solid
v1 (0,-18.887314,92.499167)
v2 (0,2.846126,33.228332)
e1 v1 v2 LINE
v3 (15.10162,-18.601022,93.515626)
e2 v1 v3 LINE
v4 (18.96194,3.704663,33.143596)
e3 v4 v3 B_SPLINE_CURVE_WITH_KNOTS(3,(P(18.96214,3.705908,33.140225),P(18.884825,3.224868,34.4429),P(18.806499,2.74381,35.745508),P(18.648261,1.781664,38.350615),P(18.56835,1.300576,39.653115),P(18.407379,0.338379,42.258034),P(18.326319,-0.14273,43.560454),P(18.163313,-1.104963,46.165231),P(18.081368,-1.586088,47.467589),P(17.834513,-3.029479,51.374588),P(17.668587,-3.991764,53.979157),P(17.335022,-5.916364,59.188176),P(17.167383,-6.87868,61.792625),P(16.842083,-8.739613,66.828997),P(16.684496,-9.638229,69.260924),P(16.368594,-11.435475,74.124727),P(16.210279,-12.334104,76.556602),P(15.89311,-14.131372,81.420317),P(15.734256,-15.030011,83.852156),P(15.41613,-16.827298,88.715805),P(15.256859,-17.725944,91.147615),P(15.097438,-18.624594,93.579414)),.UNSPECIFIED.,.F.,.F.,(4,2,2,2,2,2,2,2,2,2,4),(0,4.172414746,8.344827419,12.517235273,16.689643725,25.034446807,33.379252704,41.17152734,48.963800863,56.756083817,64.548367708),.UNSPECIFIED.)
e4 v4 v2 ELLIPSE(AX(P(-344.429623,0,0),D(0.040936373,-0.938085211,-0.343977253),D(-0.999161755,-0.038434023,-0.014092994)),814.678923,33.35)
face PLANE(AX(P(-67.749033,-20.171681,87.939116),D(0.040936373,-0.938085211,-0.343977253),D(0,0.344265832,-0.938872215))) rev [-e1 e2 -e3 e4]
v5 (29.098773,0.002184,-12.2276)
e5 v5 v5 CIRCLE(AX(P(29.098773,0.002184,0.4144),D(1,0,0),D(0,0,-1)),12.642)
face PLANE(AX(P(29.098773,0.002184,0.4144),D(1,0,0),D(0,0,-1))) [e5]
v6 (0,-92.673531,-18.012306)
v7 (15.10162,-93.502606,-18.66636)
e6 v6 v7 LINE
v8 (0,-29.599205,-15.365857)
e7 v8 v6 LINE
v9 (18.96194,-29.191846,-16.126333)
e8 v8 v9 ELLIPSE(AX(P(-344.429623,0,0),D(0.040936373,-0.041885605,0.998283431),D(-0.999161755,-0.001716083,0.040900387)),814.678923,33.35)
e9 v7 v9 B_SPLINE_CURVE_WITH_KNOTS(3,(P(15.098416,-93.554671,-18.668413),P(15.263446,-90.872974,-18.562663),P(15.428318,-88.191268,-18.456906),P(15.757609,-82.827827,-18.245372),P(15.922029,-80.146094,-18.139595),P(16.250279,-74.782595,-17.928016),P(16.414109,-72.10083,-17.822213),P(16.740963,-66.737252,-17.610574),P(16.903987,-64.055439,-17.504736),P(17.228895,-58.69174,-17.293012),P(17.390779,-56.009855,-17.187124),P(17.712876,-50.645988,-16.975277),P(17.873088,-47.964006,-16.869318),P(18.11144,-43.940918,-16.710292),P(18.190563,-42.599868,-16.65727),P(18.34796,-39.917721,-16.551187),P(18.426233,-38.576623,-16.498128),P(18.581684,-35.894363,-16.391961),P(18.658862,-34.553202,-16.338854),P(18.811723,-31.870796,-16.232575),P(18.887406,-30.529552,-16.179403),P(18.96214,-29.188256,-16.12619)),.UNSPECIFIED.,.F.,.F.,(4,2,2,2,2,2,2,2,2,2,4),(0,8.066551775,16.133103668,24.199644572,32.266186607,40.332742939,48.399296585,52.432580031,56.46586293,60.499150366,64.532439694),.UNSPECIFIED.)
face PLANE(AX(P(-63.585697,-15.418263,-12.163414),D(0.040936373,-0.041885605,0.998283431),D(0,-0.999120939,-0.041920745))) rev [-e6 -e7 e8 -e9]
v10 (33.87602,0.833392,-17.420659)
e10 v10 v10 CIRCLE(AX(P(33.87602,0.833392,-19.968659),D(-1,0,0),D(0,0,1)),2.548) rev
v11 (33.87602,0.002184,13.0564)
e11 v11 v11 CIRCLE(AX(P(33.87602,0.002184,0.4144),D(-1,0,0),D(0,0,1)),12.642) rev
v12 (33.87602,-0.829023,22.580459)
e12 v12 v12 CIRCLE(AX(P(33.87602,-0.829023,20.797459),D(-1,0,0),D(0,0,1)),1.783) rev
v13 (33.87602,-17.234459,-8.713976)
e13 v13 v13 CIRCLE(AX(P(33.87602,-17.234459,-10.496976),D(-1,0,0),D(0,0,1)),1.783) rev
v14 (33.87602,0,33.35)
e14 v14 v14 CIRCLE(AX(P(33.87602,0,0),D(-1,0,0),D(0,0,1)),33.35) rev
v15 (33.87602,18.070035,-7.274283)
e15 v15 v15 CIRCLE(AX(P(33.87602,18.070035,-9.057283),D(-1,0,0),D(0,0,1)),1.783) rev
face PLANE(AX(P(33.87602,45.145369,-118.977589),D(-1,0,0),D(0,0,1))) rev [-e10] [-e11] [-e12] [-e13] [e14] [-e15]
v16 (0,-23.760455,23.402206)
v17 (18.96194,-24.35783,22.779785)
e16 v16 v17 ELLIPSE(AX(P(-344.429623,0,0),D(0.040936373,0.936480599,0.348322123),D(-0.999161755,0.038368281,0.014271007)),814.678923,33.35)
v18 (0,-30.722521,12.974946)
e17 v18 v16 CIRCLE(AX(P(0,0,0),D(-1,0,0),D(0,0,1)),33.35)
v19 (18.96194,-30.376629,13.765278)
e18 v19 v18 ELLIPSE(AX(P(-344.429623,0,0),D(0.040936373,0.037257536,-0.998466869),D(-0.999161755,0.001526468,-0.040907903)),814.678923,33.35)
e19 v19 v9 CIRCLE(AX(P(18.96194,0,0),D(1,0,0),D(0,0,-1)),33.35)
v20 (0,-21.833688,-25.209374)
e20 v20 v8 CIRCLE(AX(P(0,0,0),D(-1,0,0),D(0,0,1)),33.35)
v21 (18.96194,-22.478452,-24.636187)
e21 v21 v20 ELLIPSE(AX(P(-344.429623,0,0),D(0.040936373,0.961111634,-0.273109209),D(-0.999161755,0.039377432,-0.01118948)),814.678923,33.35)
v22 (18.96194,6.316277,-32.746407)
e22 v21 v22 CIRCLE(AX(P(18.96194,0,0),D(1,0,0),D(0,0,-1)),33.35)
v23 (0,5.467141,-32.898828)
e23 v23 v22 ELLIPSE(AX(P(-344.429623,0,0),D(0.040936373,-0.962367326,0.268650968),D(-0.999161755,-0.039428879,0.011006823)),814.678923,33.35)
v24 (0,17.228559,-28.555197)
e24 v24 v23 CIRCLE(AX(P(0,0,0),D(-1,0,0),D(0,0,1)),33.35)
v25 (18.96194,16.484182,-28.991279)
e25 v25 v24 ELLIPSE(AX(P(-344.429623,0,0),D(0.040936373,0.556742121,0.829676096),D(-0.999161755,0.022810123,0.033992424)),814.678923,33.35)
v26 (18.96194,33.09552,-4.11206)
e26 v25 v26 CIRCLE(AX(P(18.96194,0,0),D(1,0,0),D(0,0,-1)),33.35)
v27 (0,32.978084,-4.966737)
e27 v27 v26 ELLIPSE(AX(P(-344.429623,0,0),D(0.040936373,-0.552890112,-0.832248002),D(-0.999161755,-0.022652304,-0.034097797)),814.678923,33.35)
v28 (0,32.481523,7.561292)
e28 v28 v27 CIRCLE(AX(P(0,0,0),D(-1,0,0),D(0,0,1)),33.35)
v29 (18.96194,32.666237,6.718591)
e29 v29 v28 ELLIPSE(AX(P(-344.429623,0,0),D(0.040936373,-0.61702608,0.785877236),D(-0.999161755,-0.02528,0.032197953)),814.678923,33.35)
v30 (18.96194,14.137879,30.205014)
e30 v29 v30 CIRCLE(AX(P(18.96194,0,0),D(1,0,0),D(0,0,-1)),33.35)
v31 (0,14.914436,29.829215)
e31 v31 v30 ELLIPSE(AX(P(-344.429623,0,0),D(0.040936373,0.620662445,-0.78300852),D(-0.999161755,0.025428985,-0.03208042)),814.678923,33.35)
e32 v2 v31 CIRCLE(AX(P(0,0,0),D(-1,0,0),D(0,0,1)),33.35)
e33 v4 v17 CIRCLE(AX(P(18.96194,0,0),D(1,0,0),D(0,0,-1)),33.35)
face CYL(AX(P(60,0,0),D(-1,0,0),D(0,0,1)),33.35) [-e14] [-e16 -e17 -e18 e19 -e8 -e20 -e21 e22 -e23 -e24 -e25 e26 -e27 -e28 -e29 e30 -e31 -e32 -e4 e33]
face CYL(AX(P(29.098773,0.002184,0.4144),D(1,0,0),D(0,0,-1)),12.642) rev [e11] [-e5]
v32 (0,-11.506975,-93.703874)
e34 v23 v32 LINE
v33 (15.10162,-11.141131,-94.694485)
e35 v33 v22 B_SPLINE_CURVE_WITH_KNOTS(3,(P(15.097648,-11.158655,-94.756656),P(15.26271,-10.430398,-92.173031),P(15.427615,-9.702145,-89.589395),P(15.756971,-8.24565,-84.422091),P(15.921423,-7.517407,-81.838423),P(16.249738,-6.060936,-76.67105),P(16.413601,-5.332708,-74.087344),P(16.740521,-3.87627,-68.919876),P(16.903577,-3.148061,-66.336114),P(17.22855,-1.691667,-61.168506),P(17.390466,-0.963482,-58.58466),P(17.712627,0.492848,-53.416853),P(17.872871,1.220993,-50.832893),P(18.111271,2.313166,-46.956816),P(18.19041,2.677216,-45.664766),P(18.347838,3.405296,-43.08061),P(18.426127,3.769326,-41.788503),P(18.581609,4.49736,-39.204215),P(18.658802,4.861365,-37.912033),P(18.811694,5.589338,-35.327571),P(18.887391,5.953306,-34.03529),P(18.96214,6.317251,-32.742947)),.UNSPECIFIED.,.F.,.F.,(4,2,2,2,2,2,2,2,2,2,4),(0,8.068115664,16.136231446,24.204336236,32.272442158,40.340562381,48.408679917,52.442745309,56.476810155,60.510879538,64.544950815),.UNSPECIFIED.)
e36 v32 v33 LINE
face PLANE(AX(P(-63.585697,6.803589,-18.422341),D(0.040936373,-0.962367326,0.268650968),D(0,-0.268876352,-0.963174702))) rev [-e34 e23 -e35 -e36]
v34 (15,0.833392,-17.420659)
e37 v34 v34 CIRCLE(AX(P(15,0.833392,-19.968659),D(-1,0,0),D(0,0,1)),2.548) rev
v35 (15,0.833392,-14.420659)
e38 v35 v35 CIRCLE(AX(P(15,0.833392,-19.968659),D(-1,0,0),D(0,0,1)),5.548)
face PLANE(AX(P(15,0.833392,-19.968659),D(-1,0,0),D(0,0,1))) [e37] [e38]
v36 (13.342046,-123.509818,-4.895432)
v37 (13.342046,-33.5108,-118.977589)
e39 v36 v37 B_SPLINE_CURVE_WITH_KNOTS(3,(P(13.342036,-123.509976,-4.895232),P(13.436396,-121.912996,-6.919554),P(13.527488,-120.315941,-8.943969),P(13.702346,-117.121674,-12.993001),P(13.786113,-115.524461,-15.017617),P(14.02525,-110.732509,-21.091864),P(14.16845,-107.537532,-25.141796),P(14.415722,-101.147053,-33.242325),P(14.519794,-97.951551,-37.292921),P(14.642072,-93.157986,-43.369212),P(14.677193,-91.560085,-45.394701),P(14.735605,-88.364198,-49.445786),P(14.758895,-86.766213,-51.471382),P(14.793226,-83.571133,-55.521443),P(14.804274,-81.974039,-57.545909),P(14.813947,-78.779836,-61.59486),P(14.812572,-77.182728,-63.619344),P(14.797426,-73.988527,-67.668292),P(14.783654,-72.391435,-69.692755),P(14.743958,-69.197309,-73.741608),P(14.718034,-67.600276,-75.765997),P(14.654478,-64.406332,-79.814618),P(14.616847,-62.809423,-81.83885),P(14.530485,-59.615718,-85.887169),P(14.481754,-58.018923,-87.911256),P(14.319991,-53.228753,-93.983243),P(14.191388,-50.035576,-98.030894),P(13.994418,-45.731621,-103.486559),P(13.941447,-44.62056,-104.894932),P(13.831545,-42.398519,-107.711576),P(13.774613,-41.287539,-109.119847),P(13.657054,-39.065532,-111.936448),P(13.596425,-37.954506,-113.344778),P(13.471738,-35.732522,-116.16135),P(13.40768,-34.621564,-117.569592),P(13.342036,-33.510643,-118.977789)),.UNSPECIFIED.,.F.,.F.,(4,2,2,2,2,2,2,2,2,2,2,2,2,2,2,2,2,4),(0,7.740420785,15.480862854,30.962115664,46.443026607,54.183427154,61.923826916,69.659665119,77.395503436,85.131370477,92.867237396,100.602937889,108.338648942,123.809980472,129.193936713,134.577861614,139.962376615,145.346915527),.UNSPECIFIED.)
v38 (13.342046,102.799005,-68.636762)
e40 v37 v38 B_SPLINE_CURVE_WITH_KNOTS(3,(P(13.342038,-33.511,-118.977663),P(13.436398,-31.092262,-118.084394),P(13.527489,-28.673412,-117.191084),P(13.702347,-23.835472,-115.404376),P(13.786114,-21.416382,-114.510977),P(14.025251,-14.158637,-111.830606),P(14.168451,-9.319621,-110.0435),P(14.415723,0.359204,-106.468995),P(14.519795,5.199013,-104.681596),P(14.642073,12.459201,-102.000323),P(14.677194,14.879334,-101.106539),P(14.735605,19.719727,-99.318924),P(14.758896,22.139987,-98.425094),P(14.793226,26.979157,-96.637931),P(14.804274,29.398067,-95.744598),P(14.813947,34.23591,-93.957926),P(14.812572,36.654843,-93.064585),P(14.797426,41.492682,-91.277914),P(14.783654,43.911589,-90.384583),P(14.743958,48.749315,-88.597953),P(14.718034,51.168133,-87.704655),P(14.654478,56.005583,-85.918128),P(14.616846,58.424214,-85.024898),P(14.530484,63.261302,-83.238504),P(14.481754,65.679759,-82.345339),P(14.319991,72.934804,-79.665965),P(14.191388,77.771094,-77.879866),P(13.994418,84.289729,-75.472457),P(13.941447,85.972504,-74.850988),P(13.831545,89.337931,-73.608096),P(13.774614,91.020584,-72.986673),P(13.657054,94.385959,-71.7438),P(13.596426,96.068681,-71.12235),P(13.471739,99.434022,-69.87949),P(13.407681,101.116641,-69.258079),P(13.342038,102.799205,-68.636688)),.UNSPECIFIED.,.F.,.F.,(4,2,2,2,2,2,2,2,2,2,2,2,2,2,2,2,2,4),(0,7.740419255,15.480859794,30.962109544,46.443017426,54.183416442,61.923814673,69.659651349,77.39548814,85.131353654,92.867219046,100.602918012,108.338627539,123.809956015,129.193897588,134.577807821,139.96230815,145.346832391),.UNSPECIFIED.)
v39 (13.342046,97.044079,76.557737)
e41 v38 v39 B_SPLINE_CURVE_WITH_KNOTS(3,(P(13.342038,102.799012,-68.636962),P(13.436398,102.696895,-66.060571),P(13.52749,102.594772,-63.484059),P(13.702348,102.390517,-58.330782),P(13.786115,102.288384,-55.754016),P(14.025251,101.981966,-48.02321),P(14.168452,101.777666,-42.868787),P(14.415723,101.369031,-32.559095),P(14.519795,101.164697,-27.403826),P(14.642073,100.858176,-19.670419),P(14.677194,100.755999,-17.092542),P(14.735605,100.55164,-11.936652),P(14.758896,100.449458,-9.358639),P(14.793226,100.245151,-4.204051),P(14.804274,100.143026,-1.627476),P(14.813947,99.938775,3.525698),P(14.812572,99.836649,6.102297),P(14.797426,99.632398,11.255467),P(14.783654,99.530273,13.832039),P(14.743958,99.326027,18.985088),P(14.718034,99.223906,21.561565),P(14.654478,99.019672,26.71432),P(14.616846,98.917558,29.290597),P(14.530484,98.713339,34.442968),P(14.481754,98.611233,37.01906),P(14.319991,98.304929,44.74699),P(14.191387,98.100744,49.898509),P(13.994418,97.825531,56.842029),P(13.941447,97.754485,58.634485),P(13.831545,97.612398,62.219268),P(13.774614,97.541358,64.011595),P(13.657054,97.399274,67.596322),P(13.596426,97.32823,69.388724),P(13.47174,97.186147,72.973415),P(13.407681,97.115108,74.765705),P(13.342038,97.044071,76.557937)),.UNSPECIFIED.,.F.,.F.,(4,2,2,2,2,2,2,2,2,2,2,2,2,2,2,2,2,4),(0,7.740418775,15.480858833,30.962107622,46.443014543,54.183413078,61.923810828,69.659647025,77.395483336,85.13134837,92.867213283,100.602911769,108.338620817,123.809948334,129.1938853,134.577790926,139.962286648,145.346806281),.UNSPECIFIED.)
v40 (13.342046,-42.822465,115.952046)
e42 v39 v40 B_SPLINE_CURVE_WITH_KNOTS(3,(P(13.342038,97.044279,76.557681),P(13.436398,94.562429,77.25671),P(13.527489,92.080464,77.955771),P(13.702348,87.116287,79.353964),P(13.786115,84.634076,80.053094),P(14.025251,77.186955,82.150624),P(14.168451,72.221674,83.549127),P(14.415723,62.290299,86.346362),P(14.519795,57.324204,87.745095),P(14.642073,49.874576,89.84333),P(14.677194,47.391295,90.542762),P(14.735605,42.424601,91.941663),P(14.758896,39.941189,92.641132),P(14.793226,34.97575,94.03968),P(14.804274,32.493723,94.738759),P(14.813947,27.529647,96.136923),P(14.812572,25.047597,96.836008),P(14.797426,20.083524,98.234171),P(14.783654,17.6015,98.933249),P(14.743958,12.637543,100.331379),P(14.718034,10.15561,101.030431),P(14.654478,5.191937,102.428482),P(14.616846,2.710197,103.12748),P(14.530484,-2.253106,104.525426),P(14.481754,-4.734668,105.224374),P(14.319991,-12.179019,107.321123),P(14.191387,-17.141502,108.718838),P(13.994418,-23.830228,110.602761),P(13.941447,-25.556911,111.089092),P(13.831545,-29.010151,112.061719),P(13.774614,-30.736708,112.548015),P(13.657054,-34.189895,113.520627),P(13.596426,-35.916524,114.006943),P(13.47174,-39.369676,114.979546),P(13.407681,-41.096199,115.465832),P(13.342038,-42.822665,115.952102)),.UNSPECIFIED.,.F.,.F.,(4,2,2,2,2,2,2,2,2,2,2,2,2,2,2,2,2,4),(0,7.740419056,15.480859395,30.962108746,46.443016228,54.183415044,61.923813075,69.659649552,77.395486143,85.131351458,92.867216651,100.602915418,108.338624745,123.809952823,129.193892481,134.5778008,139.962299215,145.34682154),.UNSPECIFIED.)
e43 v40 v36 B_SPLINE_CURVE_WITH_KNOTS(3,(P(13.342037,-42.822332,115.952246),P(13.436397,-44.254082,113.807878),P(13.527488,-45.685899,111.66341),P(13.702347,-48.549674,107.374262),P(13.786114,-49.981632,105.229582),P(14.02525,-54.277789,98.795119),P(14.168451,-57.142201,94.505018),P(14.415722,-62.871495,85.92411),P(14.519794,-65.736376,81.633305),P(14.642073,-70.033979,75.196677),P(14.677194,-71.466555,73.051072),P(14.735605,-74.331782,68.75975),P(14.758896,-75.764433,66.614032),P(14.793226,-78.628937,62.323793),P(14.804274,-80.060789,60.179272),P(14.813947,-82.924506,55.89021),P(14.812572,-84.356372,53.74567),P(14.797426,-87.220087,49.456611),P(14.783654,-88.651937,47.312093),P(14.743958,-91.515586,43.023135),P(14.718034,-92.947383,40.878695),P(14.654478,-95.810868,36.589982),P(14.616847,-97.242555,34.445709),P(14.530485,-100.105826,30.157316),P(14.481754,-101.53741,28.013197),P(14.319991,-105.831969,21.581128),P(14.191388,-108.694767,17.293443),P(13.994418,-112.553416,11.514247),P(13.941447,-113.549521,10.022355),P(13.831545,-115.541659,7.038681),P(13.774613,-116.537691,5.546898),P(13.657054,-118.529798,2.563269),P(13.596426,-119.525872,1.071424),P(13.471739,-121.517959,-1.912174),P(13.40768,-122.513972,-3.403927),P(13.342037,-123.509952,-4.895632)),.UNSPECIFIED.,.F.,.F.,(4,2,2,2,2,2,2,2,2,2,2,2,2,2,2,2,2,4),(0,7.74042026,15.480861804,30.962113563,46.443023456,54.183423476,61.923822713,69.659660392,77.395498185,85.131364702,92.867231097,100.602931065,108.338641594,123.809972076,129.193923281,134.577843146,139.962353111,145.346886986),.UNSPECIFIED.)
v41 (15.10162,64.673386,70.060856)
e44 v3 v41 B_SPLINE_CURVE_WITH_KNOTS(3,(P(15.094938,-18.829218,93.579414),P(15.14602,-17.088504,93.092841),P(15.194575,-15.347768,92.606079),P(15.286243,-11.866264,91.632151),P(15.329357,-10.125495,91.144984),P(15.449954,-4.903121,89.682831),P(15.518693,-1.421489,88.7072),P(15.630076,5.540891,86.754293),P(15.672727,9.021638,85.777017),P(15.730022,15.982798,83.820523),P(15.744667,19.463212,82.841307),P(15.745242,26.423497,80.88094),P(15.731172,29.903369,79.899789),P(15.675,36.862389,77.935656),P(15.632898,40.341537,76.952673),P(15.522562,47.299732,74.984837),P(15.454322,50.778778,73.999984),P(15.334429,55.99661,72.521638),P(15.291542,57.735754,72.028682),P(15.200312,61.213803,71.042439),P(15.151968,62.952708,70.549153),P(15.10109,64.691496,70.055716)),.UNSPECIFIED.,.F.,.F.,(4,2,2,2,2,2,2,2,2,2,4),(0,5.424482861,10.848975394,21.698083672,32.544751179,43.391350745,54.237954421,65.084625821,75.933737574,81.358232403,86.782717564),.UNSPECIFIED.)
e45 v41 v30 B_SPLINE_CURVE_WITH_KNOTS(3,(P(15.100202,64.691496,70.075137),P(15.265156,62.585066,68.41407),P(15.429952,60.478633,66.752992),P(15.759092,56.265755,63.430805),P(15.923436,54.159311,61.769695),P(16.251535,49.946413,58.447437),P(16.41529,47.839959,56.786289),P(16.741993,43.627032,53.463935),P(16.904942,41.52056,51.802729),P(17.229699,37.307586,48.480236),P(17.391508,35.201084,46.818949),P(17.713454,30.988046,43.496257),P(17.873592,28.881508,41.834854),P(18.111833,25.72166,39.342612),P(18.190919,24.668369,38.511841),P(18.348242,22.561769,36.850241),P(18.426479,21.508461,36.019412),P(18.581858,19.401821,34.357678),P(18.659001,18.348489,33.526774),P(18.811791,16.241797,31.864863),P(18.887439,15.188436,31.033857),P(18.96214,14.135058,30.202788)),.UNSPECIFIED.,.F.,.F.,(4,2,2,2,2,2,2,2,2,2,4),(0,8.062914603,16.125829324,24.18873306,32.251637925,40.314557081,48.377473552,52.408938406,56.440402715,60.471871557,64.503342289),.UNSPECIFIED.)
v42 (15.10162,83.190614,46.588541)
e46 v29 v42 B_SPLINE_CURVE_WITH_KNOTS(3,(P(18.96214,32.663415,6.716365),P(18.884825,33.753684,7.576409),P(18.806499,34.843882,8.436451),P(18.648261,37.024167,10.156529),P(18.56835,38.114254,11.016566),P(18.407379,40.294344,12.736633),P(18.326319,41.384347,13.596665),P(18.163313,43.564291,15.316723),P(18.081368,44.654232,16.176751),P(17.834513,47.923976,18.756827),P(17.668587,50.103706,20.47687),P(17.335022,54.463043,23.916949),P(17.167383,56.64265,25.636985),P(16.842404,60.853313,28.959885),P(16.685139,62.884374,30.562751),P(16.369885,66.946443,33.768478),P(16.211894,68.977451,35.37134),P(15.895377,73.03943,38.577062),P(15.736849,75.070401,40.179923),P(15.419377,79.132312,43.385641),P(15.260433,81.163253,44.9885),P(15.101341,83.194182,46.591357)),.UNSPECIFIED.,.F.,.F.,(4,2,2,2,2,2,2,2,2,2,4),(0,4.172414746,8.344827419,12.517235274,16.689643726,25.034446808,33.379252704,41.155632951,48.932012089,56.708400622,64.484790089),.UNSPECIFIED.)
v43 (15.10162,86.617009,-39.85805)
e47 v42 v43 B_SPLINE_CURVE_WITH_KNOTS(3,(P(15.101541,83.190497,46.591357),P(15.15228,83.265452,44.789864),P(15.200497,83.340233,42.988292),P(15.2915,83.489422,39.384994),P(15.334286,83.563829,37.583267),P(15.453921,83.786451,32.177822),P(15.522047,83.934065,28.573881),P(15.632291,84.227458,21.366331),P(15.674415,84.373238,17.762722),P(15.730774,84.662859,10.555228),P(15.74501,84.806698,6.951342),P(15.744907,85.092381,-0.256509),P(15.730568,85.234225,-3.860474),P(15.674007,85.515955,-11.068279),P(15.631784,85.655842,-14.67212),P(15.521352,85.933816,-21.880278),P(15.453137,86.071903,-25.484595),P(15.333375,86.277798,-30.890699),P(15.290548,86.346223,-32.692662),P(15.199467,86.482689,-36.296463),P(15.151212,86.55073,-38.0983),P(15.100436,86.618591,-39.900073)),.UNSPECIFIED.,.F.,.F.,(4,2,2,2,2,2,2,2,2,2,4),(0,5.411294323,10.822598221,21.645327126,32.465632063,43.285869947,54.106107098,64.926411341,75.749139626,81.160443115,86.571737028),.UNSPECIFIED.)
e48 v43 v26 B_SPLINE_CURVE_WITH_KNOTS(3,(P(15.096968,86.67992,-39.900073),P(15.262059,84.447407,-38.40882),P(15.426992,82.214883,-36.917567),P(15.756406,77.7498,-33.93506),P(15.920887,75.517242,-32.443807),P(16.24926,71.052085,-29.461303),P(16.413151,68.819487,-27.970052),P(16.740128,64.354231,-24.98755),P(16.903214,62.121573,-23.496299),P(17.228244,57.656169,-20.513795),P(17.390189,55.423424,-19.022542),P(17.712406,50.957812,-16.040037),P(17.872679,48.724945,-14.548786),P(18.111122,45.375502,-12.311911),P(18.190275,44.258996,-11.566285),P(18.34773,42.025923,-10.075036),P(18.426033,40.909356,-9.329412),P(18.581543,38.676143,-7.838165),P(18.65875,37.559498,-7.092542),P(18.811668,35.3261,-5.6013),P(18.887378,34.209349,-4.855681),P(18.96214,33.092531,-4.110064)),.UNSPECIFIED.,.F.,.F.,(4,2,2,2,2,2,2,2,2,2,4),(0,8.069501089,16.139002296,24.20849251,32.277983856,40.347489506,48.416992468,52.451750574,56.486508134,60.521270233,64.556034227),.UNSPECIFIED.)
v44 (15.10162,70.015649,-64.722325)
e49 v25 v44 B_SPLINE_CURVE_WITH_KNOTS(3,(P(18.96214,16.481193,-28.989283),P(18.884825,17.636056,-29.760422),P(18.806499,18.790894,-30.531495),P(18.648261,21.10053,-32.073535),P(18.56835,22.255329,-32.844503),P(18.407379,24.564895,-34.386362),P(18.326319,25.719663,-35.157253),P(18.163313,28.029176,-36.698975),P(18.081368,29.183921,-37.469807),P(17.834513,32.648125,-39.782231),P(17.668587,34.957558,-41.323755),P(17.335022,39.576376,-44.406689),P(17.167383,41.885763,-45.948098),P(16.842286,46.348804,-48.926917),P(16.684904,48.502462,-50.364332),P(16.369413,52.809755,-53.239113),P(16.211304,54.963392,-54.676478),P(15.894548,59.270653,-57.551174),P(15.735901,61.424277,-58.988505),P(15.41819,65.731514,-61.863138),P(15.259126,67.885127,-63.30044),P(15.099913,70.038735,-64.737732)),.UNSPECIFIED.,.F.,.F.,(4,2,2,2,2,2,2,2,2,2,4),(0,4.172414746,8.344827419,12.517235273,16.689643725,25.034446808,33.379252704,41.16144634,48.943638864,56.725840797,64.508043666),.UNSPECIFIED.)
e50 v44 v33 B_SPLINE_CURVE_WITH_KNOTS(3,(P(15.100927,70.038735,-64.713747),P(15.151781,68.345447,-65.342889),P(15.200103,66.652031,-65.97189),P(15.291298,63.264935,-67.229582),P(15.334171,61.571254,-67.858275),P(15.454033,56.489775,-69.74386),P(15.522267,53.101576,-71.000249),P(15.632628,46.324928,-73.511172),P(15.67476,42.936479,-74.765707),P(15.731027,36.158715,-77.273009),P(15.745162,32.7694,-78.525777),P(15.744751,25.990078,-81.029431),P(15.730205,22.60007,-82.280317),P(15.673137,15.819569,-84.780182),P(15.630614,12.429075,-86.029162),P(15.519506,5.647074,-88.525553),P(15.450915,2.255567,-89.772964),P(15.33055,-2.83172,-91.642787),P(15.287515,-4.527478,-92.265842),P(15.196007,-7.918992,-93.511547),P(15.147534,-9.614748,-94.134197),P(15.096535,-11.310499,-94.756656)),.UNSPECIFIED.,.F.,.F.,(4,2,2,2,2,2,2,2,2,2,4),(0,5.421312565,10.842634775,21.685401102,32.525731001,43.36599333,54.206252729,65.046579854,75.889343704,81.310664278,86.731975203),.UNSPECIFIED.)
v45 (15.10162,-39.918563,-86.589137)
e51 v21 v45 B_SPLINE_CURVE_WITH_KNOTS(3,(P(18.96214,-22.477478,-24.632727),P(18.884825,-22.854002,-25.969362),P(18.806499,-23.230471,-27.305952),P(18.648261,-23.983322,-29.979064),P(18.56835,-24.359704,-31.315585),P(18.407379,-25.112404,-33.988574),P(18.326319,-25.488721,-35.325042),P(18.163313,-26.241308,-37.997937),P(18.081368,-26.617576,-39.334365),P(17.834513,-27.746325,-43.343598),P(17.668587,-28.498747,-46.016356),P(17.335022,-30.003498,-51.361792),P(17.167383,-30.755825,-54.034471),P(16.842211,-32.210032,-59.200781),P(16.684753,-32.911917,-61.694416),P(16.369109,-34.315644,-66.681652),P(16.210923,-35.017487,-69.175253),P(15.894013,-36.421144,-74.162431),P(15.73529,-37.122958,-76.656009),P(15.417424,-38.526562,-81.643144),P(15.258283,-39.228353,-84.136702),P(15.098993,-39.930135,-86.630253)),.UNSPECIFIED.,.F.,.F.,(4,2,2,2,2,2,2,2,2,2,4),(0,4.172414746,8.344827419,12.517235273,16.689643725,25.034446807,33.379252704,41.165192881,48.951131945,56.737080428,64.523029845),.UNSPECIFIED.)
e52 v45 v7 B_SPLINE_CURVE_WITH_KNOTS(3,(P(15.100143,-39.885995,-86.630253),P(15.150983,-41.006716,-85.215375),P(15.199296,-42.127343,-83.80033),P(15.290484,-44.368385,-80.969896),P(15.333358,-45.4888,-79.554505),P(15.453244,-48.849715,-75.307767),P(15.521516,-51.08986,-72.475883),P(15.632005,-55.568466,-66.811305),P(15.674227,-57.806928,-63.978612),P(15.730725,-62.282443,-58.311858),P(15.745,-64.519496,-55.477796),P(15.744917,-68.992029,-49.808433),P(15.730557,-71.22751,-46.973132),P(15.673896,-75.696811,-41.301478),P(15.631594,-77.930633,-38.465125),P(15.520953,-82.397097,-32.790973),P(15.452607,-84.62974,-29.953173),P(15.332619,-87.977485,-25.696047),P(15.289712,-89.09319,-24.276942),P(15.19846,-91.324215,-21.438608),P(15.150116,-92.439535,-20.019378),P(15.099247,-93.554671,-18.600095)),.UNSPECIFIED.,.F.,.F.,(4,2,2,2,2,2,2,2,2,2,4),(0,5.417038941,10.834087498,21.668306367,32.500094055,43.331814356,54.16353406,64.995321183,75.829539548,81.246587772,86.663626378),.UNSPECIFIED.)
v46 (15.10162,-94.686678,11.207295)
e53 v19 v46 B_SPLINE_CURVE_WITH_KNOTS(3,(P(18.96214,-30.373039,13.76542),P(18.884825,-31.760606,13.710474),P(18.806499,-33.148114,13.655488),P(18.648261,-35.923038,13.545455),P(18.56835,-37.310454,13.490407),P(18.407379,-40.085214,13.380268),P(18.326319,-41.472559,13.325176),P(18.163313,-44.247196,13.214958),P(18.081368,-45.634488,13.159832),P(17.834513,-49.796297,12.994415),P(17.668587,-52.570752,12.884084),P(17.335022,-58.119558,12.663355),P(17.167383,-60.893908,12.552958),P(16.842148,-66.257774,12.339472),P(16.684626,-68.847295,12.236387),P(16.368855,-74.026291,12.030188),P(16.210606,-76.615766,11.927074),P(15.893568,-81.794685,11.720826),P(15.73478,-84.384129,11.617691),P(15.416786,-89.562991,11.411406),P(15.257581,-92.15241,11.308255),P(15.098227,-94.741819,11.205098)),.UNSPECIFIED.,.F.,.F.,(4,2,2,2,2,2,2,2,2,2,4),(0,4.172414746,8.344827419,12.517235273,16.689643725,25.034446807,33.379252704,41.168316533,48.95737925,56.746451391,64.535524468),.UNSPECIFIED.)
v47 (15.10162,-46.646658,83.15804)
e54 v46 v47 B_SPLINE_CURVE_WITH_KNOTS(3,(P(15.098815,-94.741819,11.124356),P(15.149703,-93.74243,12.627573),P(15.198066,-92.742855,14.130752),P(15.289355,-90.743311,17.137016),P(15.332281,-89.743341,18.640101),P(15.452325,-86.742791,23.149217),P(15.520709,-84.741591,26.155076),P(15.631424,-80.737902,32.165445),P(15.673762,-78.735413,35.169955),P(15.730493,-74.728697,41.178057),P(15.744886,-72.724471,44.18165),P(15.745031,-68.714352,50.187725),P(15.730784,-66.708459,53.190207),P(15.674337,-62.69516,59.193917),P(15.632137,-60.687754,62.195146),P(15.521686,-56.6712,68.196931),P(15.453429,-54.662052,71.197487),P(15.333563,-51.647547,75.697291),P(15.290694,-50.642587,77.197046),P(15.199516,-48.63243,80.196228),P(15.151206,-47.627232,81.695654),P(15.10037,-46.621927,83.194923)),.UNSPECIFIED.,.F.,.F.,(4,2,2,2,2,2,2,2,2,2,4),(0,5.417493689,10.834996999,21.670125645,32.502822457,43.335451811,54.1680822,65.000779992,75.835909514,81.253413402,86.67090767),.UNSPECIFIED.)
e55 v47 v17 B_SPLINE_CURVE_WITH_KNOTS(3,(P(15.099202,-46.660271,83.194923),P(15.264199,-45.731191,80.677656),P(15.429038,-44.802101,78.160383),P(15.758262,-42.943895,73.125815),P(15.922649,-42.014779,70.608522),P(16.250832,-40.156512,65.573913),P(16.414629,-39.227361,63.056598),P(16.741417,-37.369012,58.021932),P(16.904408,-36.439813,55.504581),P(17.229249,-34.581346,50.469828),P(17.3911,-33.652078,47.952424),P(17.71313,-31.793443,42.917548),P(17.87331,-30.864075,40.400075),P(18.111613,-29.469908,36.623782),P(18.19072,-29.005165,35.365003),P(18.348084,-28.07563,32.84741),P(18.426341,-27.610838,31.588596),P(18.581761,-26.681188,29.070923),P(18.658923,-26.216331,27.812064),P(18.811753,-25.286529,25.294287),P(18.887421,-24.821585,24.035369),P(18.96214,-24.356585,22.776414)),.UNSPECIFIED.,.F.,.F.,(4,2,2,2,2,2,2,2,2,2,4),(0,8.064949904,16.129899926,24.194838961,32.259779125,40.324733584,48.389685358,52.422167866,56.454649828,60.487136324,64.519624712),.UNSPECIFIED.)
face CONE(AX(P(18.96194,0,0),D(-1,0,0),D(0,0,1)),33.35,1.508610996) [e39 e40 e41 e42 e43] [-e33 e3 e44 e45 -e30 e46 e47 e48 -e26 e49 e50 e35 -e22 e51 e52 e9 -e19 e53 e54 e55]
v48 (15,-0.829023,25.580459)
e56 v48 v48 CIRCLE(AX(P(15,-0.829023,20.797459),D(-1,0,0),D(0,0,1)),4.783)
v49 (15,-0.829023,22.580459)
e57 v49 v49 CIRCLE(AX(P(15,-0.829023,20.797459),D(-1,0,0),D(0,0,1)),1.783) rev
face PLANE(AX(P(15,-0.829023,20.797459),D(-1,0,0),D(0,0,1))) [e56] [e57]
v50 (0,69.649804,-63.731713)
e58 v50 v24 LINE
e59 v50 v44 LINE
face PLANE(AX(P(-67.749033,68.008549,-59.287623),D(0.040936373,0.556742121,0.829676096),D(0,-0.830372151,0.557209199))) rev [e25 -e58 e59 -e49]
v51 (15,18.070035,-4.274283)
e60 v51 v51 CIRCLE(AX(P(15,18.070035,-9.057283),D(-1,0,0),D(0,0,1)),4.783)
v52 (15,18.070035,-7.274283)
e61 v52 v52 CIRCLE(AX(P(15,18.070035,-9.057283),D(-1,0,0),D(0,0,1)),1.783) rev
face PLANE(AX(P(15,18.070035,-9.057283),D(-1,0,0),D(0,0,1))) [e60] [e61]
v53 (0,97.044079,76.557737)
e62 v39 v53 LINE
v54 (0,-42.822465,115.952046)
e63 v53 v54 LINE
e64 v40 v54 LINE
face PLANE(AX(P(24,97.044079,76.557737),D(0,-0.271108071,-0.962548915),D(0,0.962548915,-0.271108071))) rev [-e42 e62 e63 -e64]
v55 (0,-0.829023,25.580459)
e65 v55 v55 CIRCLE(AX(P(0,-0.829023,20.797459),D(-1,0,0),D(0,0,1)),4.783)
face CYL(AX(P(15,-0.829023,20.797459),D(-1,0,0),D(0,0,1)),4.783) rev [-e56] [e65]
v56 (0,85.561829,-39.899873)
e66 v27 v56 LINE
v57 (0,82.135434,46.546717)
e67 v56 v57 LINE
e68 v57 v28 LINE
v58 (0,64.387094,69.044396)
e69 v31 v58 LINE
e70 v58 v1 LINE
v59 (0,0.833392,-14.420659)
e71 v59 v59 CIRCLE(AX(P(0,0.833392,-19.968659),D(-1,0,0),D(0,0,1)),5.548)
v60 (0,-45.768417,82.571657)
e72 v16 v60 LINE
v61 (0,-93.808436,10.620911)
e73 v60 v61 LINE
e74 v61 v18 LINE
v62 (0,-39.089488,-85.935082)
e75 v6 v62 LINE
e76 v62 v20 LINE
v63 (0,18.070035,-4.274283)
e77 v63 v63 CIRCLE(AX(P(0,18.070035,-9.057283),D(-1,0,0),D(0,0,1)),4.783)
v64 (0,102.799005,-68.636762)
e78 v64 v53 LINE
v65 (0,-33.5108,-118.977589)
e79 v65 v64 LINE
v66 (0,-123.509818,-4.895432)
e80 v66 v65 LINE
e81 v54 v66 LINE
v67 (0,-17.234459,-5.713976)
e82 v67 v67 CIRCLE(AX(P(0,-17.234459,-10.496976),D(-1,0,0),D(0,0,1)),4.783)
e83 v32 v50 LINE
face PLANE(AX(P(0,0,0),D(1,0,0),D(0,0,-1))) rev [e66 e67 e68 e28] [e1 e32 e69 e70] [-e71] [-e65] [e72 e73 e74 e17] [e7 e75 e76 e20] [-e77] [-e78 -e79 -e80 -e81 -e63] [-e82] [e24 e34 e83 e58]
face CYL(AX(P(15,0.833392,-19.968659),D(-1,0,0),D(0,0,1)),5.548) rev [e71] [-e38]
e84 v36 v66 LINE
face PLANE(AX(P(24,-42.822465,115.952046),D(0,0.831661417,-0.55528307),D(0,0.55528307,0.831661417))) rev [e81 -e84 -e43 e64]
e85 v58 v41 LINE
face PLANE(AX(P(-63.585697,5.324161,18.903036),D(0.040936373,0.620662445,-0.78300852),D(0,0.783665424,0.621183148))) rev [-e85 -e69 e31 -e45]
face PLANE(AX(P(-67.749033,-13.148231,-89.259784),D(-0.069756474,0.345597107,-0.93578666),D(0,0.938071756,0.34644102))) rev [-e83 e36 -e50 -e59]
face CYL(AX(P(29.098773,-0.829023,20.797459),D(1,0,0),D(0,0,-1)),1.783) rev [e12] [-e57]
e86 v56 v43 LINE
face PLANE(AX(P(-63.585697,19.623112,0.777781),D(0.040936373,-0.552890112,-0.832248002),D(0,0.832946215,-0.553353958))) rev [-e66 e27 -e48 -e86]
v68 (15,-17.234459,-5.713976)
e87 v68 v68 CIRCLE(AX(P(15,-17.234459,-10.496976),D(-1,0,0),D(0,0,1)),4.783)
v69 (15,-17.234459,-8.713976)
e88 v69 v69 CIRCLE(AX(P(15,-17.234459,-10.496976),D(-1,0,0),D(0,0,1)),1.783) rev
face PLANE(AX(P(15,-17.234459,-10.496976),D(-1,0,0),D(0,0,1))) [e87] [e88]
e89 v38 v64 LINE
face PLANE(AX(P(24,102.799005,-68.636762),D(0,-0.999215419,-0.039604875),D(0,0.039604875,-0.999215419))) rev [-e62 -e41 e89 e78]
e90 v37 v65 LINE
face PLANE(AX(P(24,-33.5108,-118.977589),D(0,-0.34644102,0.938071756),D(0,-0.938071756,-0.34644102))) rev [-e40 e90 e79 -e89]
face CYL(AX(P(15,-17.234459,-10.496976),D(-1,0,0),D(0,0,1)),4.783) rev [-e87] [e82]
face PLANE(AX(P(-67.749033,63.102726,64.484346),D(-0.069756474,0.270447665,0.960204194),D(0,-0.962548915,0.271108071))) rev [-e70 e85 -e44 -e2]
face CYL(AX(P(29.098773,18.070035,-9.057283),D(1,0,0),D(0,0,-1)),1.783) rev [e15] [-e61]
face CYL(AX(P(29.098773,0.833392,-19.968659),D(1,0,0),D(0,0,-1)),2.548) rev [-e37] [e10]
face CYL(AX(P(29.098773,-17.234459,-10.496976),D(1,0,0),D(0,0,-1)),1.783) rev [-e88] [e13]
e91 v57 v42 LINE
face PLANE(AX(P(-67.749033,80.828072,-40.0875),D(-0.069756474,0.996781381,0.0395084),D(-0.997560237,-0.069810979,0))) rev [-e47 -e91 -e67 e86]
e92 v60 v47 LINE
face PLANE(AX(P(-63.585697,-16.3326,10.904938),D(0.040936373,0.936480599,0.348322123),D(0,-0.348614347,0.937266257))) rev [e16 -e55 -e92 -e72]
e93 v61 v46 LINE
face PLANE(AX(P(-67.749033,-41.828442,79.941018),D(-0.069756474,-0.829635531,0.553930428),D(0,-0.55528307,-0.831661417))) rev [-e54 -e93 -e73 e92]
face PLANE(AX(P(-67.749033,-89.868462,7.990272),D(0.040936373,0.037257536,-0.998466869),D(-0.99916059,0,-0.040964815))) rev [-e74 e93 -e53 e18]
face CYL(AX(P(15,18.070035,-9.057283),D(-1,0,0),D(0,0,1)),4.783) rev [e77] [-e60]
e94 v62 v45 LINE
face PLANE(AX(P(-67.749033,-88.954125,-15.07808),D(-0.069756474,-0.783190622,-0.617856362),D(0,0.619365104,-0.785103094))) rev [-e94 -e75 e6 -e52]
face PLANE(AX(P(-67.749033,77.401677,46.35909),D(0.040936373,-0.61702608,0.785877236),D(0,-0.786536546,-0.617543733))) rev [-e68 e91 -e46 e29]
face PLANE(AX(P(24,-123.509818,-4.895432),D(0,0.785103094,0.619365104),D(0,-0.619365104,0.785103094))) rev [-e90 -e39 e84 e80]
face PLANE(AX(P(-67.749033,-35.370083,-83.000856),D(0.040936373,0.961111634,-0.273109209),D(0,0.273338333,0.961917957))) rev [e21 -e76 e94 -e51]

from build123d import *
from OCP.BRepAlgoAPI import BRepAlgoAPI_Cut
from OCP.TopTools import TopTools_ListOfShape
from build123d.topology import SkipClean

# Parameters (mm, degrees)
EXTRUDE_1_DEPTH             = 24
CUT_EXTRUDE_1_DEPTH         = 30
PATTERN_CIRCULAR_1_COUNT    = 5
CUT_EXTRUDE_2_DEPTH         = 84
PATTERN_CIRCULAR_2_COUNT    = 5
SKETCH_3_R                  = 33.35
EXTRUDE_2_DEPTH             = 60
CUT_EXTRUDE_START           = 0.102
CUT_EXTRUDE_4_OUTLINE_R     = 33.35
CUT_EXTRUDE_4_OUTLINE_R_2   = 9.18
CUT_EXTRUDE_4_DEPTH         = 5.799227236
CUT_EXTRUDE_START_2         = -12.5
CUT_EXTRUDE_4_2_OUTLINE_R   = 1.683
CUT_EXTRUDE_4_2_OUTLINE_R_2 = 2.448
CUT_EXTRUDE_4_2_DEPTH       = 12.738427236
CUT_EXTRUDE_START_3         = -1.428
CUT_EXTRUDE_4_3_OUTLINE_R   = 10.914
CUT_EXTRUDE_4_3_OUTLINE_R_2 = 9.18
CUT_EXTRUDE_4_3_DEPTH       = 1.666427236
CUT_EXTRUDE_4_4_OUTLINE_R   = 11.22
CUT_EXTRUDE_4_4_OUTLINE_R_2 = 10.914
CUT_EXTRUDE_4_4_DEPTH       = 1.122
CUT_EXTRUDE_4_5_OUTLINE_R   = 11.22
CUT_EXTRUDE_4_5_OUTLINE_R_2 = 10.914
CUT_EXTRUDE_4_5_DEPTH       = 0.238427236
SKETCH_11_R                 = 12.642
SKETCH_11_R_2               = 1.783
SKETCH_11_R_3               = 2.548
CUT_EXTRUDE_7_DEPTH         = 25
CUT_EXTRUDE_8_DEPTH         = 182.687484155
CUT_EXTRUDE_8_DEPTH_BACK    = 182.687484155
SKETCH_12_W                 = 55.167462985
SKETCH_12_H                 = 93.873666854
CUT_EXTRUDE_9_DEPTH         = 175.808256688
CUT_EXTRUDE_9_DEPTH_BACK    = 175.808256688
SKETCH_13_R                 = 1.783
SKETCH_13_R_2               = 2.548
SKETCH_14_R                 = 4.783
SKETCH_14_R_2               = 5.548
CUT_EXTRUDE_10_DEPTH        = 15


with BuildPart() as part:
    # 草图1 → 凸台-拉伸1 (new body)
    with BuildSketch(Plane(origin=(0, 0, 0), x_dir=(0, 0, -1), z_dir=(1, 0, 0))):
        Polygon((118.97758907, -33.510800483), (68.636762138, 102.799004534), (-76.557737191, 97.044079295), (-115.952045824, -42.822465123), (4.895431807, -123.509818223), align=None)
    extrude(amount=EXTRUDE_1_DEPTH)

    # 草图2 → 切除-拉伸1 (cut)
    with BuildSketch(Plane(origin=(21.885665564, 0.414902387, 1.473079874), x_dir=(0, 0.9625489150768215, -0.2711080708581613), z_dir=(-0.9975640502598243, -0.018911543026637837, -0.06714401812199275))):
        Polygon((-72.654252801, -98.71005792), (72.654252801, -98.71005792), (368.193435696, -98.71005792), (343.034484831, 55.492595796), (-381.628768987, 22.909231101), (-450.567959047, -98.71005792), align=None)
    cut_extrude_1 = extrude(amount=-CUT_EXTRUDE_1_DEPTH, mode=Mode.SUBTRACT)

    # 阵列(圆周)1: 切除-拉伸1 ×5 about axis
    pattern_circular_1_axis = Axis((0, 0, 0), (1, 0, 0))
    for i in range(1, PATTERN_CIRCULAR_1_COUNT):
        add(cut_extrude_1.rotate(pattern_circular_1_axis, i * 360 / PATTERN_CIRCULAR_1_COUNT), mode=Mode.SUBTRACT)

    # 草图4 → 切除-拉伸2 (cut)
    with BuildSketch(Plane(origin=(21.885665564, 0.530191543, -1.435620156), x_dir=(-0.06540654102068788, -0.0020321134284714422, -0.9978566304368194), z_dir=(0.9975640502598243, 0.024166503933362515, -0.06543657782046403))):
        Polygon((93.526415419, -11.461750602), (63.453576352, 69.657775992), (22.527950254, 8.351619529), align=None)
    cut_extrude_2 = extrude(amount=-CUT_EXTRUDE_2_DEPTH, mode=Mode.SUBTRACT)

    # 阵列(圆周)2: 切除-拉伸2 ×5 about axis
    pattern_circular_2_axis = Axis((0, 0, 0), (1, 0, 0))
    for i in range(1, PATTERN_CIRCULAR_2_COUNT):
        add(cut_extrude_2.rotate(pattern_circular_2_axis, i * 360 / PATTERN_CIRCULAR_2_COUNT), mode=Mode.SUBTRACT)

    # 草图3 → 凸台-拉伸2 (add)
    with BuildSketch(Plane.ZY):
        Circle(SKETCH_3_R)
    extrude(amount=-EXTRUDE_2_DEPTH)


with BuildPart() as cut_extrude_4_tool:
    # 切除-拉伸4: read off the stored shape, not the designer's step
    # 切除-拉伸4 outline → 切除-拉伸4 (new body)
    with BuildSketch(Plane(origin=(54.098772764, 0, 0), x_dir=(0, 0, -1), z_dir=(1, 0, 0)).offset(CUT_EXTRUDE_START)):
        Circle(CUT_EXTRUDE_4_OUTLINE_R)
        with Locations((-0.4144, 0.002184363)):
            Circle(CUT_EXTRUDE_4_OUTLINE_R_2, mode=Mode.SUBTRACT)
    extrude(amount=CUT_EXTRUDE_4_DEPTH)


with BuildPart() as part_1:
    add(part.part)

    # 切除-拉伸4: cut by cut_extrude_4_tool, with a tolerance
    cut_extrude_4_stock = TopTools_ListOfShape()
    cut_extrude_4_stock.Append(part_1.part.wrapped)
    cut_extrude_4_tools = TopTools_ListOfShape()
    cut_extrude_4_tools.Append(cut_extrude_4_tool.part.wrapped)
    cut_extrude_4_cut = BRepAlgoAPI_Cut()
    cut_extrude_4_cut.SetArguments(cut_extrude_4_stock)
    cut_extrude_4_cut.SetTools(cut_extrude_4_tools)
    cut_extrude_4_cut.SetFuzzyValue(0.00001)
    cut_extrude_4_cut.Build()
    add(Compound.cast(cut_extrude_4_cut.Shape()).solids(), mode=Mode.REPLACE)


with BuildPart() as cut_extrude_4_2_tool:
    # Cut-Extrude 4 2 outline → Cut-Extrude 4 2 (new body)
    with BuildSketch(Plane(origin=(54.098772764, 0, 0), x_dir=(0, 0, -1), z_dir=(1, 0, 0)).offset(CUT_EXTRUDE_START_2)):
        with Locations((-20.797458989, -0.829023312)):
            Circle(CUT_EXTRUDE_4_2_OUTLINE_R)
        with Locations((9.057282532, 18.070035094)):
            Circle(CUT_EXTRUDE_4_2_OUTLINE_R)
        with Locations((19.96865899, 0.83339204)):
            Circle(CUT_EXTRUDE_4_2_OUTLINE_R_2)
        with Locations((10.496976459, -17.234458691)):
            Circle(CUT_EXTRUDE_4_2_OUTLINE_R)
    extrude(amount=CUT_EXTRUDE_4_2_DEPTH)


with BuildPart() as part_2:
    add(part_1.part)

    # Cut-Extrude 4 2: cut by cut_extrude_4_2_tool, with a tolerance
    cut_extrude_4_2_stock = TopTools_ListOfShape()
    cut_extrude_4_2_stock.Append(part_2.part.wrapped)
    cut_extrude_4_2_tools = TopTools_ListOfShape()
    cut_extrude_4_2_tools.Append(cut_extrude_4_2_tool.part.wrapped)
    cut_extrude_4_2_cut = BRepAlgoAPI_Cut()
    cut_extrude_4_2_cut.SetArguments(cut_extrude_4_2_stock)
    cut_extrude_4_2_cut.SetTools(cut_extrude_4_2_tools)
    cut_extrude_4_2_cut.SetFuzzyValue(0.00001)
    cut_extrude_4_2_cut.Build()
    add(Compound.cast(cut_extrude_4_2_cut.Shape()).solids(), mode=Mode.REPLACE)


with BuildPart() as cut_extrude_4_3_tool:
    # Cut-Extrude 4 3 outline → Cut-Extrude 4 3 (new body)
    with BuildSketch(Plane(origin=(54.098772764, 0, 0), x_dir=(0, 0, -1), z_dir=(1, 0, 0)).offset(CUT_EXTRUDE_START_3)):
        with Locations((-0.4144, 0.002184363)):
            Circle(CUT_EXTRUDE_4_3_OUTLINE_R)
        with Locations((-0.4144, 0.002184363)):
            Circle(CUT_EXTRUDE_4_3_OUTLINE_R_2, mode=Mode.SUBTRACT)
    extrude(amount=CUT_EXTRUDE_4_3_DEPTH)


with BuildPart() as part_3:
    add(part_2.part)

    # Cut-Extrude 4 3: cut by cut_extrude_4_3_tool, with a tolerance
    cut_extrude_4_3_stock = TopTools_ListOfShape()
    cut_extrude_4_3_stock.Append(part_3.part.wrapped)
    cut_extrude_4_3_tools = TopTools_ListOfShape()
    cut_extrude_4_3_tools.Append(cut_extrude_4_3_tool.part.wrapped)
    cut_extrude_4_3_cut = BRepAlgoAPI_Cut()
    cut_extrude_4_3_cut.SetArguments(cut_extrude_4_3_stock)
    cut_extrude_4_3_cut.SetTools(cut_extrude_4_3_tools)
    cut_extrude_4_3_cut.SetFuzzyValue(0.00001)
    cut_extrude_4_3_cut.Build()
    add(Compound.cast(cut_extrude_4_3_cut.Shape()).solids(), mode=Mode.REPLACE)


with BuildPart() as cut_extrude_4_4_tool:
    # Cut-Extrude 4 4 outline → Cut-Extrude 4 4 (new body)
    with BuildSketch(Plane(origin=(54.098772764, 0, 0), x_dir=(0, 0, -1), z_dir=(1, 0, 0)).offset(CUT_EXTRUDE_START_3)):
        with Locations((-0.4144, 0.002184363)):
            Circle(CUT_EXTRUDE_4_4_OUTLINE_R)
        with Locations((-0.4144, 0.002184363)):
            Circle(CUT_EXTRUDE_4_4_OUTLINE_R_2, mode=Mode.SUBTRACT)
    extrude(amount=CUT_EXTRUDE_4_4_DEPTH)


with BuildPart() as part_4:
    add(part_3.part)

    # Cut-Extrude 4 4: cut by cut_extrude_4_4_tool, with a tolerance
    cut_extrude_4_4_stock = TopTools_ListOfShape()
    cut_extrude_4_4_stock.Append(part_4.part.wrapped)
    cut_extrude_4_4_tools = TopTools_ListOfShape()
    cut_extrude_4_4_tools.Append(cut_extrude_4_4_tool.part.wrapped)
    cut_extrude_4_4_cut = BRepAlgoAPI_Cut()
    cut_extrude_4_4_cut.SetArguments(cut_extrude_4_4_stock)
    cut_extrude_4_4_cut.SetTools(cut_extrude_4_4_tools)
    cut_extrude_4_4_cut.SetFuzzyValue(0.00001)
    cut_extrude_4_4_cut.Build()
    add(Compound.cast(cut_extrude_4_4_cut.Shape()).solids(), mode=Mode.REPLACE)


with BuildPart() as cut_extrude_4_5_tool:
    # Cut-Extrude 4 5 outline → Cut-Extrude 4 5 (new body)
    with BuildSketch(Plane(origin=(54.098772764, 0, 0), x_dir=(0, 0, -1), z_dir=(1, 0, 0))):
        with Locations((-0.4144, 0.002184363)):
            Circle(CUT_EXTRUDE_4_5_OUTLINE_R)
        with Locations((-0.4144, 0.002184363)):
            Circle(CUT_EXTRUDE_4_5_OUTLINE_R_2, mode=Mode.SUBTRACT)
    extrude(amount=CUT_EXTRUDE_4_5_DEPTH)


with BuildPart() as part_5:
    add(part_4.part)

    # Cut-Extrude 4 5: cut by cut_extrude_4_5_tool, with a tolerance
    cut_extrude_4_5_stock = TopTools_ListOfShape()
    cut_extrude_4_5_stock.Append(part_5.part.wrapped)
    cut_extrude_4_5_tools = TopTools_ListOfShape()
    cut_extrude_4_5_tools.Append(cut_extrude_4_5_tool.part.wrapped)
    cut_extrude_4_5_cut = BRepAlgoAPI_Cut()
    cut_extrude_4_5_cut.SetArguments(cut_extrude_4_5_stock)
    cut_extrude_4_5_cut.SetTools(cut_extrude_4_5_tools)
    cut_extrude_4_5_cut.SetFuzzyValue(0.00001)
    cut_extrude_4_5_cut.Build()
    add(Compound.cast(cut_extrude_4_5_cut.Shape()).solids(), mode=Mode.REPLACE)


with BuildPart() as cut_extrude_4_6_tool:
    # Cut-Extrude 4 6 outline → Cut-Extrude 4 6 (revolve)
    with BuildSketch(Plane(origin=(0, 0.002184363, 0.4144), x_dir=(0, 1, 0), z_dir=(0, 0, -1))):
        Polygon((33.764400071, 54.200772764), (12.24, 54.200772764), (12.342, 54.098772764), (33.764400071, 54.098772764), align=None)
        Polygon((12.138, 54.098772764), (12.24, 54.200772764), (11.22, 54.200772764), (11.22, 54.098772764), align=None)
        Polygon((11.118, 52.568772764), (11.22, 52.670772764), (9.18, 52.670772764), (9.282, 52.568772764), align=None)
    revolve(axis=Axis((0, 0.002184363, 0.4144), (1, 0, 0)))


with BuildPart() as part_6:
    add(part_5.part)

    # Cut-Extrude 4 6: cut by cut_extrude_4_6_tool, with a tolerance
    cut_extrude_4_6_stock = TopTools_ListOfShape()
    cut_extrude_4_6_stock.Append(part_6.part.wrapped)
    cut_extrude_4_6_tools = TopTools_ListOfShape()
    cut_extrude_4_6_tools.Append(cut_extrude_4_6_tool.part.wrapped)
    cut_extrude_4_6_cut = BRepAlgoAPI_Cut()
    cut_extrude_4_6_cut.SetArguments(cut_extrude_4_6_stock)
    cut_extrude_4_6_cut.SetTools(cut_extrude_4_6_tools)
    cut_extrude_4_6_cut.SetFuzzyValue(0.00001)
    cut_extrude_4_6_cut.Build()
    add(Compound.cast(cut_extrude_4_6_cut.Shape()).solids(), mode=Mode.REPLACE)


with BuildPart() as cut_extrude_4_7_tool:
    # Cut-Extrude 4 7 outline → Cut-Extrude 4 7 (revolve)
    with BuildSketch(Plane.YX):
        Polygon((123.60679775, 13.34204565), (123.60679775, 20.106005687), (33.349999999, 20.106005687), (33.349999999, 18.961940411), align=None)
    revolve(axis=Axis((0, 0, 0), (1, 0, 0)))


with BuildPart() as part_7:
    add(part_6.part)

    # Cut-Extrude 4 7: cut by cut_extrude_4_7_tool, with a tolerance
    cut_extrude_4_7_stock = TopTools_ListOfShape()
    cut_extrude_4_7_stock.Append(part_7.part.wrapped)
    cut_extrude_4_7_tools = TopTools_ListOfShape()
    cut_extrude_4_7_tools.Append(cut_extrude_4_7_tool.part.wrapped)
    cut_extrude_4_7_cut = BRepAlgoAPI_Cut()
    cut_extrude_4_7_cut.SetArguments(cut_extrude_4_7_stock)
    cut_extrude_4_7_cut.SetTools(cut_extrude_4_7_tools)
    cut_extrude_4_7_cut.SetFuzzyValue(0.00001)
    cut_extrude_4_7_cut.Build()
    add(Compound.cast(cut_extrude_4_7_cut.Shape()).solids(), mode=Mode.REPLACE)

    # 草图11 → 切除-拉伸7 (cut)
    with SkipClean():  # the faces are left unmerged after this step: merging them gives an invalid solid
        with BuildSketch(Plane(origin=(54.098772764, 0, 0), x_dir=(0, 0, -1), z_dir=(1, 0, 0))):
            with Locations((-0.4144, 0.002184363)):
                Circle(SKETCH_11_R)
            with Locations((-20.797458989, -0.829023312)):
                Circle(SKETCH_11_R_2)
            with Locations((9.057282532, 18.070035094)):
                Circle(SKETCH_11_R_2)
            with Locations((19.96865899, 0.83339204)):
                Circle(SKETCH_11_R_3)
            with Locations((10.496976459, -17.234458691)):
                Circle(SKETCH_11_R_2)
        extrude(amount=-CUT_EXTRUDE_7_DEPTH, mode=Mode.SUBTRACT)


with BuildPart() as cut_extrude_7_piece_1:
    # of the separate pieces the step leaves, piece 1, a body of its own (cut_extrude_7_pieces)
    add(part_7.part.solids().sort_by_distance((0, -33.510800483, -118.97758907))[0])


with BuildPart() as cut_extrude_7_piece_2:
    # of the separate pieces the step leaves, piece 2, a body of its own (cut_extrude_7_pieces)
    add(part_7.part.solids().sort_by_distance((60, 0.002184363, -8.7656))[0])


with BuildPart() as cut_extrude_7_piece_3:
    # of the separate pieces the step leaves, piece 3, a body of its own (cut_extrude_7_pieces)
    add(part_7.part.solids().sort_by_distance((54.200772764, 12.242184363, 0.4144))[0])


with BuildPart() as cut_extrude_8_tool:
    # 草图12 → 切除-拉伸8 (new, two sides: drawn at the far end of the back side and taken through both)
    with SkipClean():  # the faces are left unmerged after this step: merging them gives an invalid solid
        with BuildSketch(Plane.XY.offset(-CUT_EXTRUDE_8_DEPTH_BACK)):
            with Locations((61.45975115, -1.791464419)):
                Rectangle(SKETCH_12_W, SKETCH_12_H)
        extrude(amount=CUT_EXTRUDE_8_DEPTH + CUT_EXTRUDE_8_DEPTH_BACK)


with BuildPart() as cut_extrude_7_piece_1_1:
    with SkipClean():  # the faces are left unmerged after this step: merging them gives an invalid solid
        add(cut_extrude_7_piece_1.part)

        # 切除-拉伸8: cut by cut_extrude_8_tool
        add(cut_extrude_8_tool.part, mode=Mode.SUBTRACT)

    # 草图13 → 切除-拉伸9 (cut, two sides: drawn at the far end of the back side and taken through both)
    with SkipClean():  # the faces are left unmerged after this step: merging them gives an invalid solid
        with BuildSketch(Plane(origin=(33.876019657, 0, 0), x_dir=(0, 0, -1), z_dir=(1, 0, 0)).offset(-CUT_EXTRUDE_9_DEPTH_BACK)):
            with Locations((10.496976459, -17.234458691)):
                Circle(SKETCH_13_R)
            with Locations((19.96865899, 0.83339204)):
                Circle(SKETCH_13_R_2)
            with Locations((9.057282532, 18.070035094)):
                Circle(SKETCH_13_R)
            with Locations((-20.797458989, -0.829023312)):
                Circle(SKETCH_13_R)
        extrude(amount=CUT_EXTRUDE_9_DEPTH + CUT_EXTRUDE_9_DEPTH_BACK, mode=Mode.SUBTRACT)

    # 草图14 → 切除-拉伸10 (cut)
    with SkipClean():  # the faces are left unmerged after this step: merging them gives an invalid solid
        with BuildSketch(Plane.ZY):
            with Locations((-9.057282532, 18.070035094)):
                Circle(SKETCH_14_R)
            with Locations((-19.96865899, 0.83339204)):
                Circle(SKETCH_14_R_2)
            with Locations((-10.496976459, -17.234458691)):
                Circle(SKETCH_14_R)
            with Locations((20.797458989, -0.829023312)):
                Circle(SKETCH_14_R)
        extrude(amount=-CUT_EXTRUDE_10_DEPTH, mode=Mode.SUBTRACT)


with BuildPart() as cut_extrude_7_piece_2_1:
    with SkipClean():  # the faces are left unmerged after this step: merging them gives an invalid solid
        add(cut_extrude_7_piece_2.part)

        # 切除-拉伸8: cut by cut_extrude_8_tool
        add(cut_extrude_8_tool.part, mode=Mode.SUBTRACT)


with BuildPart() as cut_extrude_7_piece_3_1:
    with SkipClean():  # the faces are left unmerged after this step: merging them gives an invalid solid
        add(cut_extrude_7_piece_3.part)

        # 切除-拉伸8: cut by cut_extrude_8_tool
        add(cut_extrude_8_tool.part, mode=Mode.SUBTRACT)


solid = cut_extrude_7_piece_1_1.part
